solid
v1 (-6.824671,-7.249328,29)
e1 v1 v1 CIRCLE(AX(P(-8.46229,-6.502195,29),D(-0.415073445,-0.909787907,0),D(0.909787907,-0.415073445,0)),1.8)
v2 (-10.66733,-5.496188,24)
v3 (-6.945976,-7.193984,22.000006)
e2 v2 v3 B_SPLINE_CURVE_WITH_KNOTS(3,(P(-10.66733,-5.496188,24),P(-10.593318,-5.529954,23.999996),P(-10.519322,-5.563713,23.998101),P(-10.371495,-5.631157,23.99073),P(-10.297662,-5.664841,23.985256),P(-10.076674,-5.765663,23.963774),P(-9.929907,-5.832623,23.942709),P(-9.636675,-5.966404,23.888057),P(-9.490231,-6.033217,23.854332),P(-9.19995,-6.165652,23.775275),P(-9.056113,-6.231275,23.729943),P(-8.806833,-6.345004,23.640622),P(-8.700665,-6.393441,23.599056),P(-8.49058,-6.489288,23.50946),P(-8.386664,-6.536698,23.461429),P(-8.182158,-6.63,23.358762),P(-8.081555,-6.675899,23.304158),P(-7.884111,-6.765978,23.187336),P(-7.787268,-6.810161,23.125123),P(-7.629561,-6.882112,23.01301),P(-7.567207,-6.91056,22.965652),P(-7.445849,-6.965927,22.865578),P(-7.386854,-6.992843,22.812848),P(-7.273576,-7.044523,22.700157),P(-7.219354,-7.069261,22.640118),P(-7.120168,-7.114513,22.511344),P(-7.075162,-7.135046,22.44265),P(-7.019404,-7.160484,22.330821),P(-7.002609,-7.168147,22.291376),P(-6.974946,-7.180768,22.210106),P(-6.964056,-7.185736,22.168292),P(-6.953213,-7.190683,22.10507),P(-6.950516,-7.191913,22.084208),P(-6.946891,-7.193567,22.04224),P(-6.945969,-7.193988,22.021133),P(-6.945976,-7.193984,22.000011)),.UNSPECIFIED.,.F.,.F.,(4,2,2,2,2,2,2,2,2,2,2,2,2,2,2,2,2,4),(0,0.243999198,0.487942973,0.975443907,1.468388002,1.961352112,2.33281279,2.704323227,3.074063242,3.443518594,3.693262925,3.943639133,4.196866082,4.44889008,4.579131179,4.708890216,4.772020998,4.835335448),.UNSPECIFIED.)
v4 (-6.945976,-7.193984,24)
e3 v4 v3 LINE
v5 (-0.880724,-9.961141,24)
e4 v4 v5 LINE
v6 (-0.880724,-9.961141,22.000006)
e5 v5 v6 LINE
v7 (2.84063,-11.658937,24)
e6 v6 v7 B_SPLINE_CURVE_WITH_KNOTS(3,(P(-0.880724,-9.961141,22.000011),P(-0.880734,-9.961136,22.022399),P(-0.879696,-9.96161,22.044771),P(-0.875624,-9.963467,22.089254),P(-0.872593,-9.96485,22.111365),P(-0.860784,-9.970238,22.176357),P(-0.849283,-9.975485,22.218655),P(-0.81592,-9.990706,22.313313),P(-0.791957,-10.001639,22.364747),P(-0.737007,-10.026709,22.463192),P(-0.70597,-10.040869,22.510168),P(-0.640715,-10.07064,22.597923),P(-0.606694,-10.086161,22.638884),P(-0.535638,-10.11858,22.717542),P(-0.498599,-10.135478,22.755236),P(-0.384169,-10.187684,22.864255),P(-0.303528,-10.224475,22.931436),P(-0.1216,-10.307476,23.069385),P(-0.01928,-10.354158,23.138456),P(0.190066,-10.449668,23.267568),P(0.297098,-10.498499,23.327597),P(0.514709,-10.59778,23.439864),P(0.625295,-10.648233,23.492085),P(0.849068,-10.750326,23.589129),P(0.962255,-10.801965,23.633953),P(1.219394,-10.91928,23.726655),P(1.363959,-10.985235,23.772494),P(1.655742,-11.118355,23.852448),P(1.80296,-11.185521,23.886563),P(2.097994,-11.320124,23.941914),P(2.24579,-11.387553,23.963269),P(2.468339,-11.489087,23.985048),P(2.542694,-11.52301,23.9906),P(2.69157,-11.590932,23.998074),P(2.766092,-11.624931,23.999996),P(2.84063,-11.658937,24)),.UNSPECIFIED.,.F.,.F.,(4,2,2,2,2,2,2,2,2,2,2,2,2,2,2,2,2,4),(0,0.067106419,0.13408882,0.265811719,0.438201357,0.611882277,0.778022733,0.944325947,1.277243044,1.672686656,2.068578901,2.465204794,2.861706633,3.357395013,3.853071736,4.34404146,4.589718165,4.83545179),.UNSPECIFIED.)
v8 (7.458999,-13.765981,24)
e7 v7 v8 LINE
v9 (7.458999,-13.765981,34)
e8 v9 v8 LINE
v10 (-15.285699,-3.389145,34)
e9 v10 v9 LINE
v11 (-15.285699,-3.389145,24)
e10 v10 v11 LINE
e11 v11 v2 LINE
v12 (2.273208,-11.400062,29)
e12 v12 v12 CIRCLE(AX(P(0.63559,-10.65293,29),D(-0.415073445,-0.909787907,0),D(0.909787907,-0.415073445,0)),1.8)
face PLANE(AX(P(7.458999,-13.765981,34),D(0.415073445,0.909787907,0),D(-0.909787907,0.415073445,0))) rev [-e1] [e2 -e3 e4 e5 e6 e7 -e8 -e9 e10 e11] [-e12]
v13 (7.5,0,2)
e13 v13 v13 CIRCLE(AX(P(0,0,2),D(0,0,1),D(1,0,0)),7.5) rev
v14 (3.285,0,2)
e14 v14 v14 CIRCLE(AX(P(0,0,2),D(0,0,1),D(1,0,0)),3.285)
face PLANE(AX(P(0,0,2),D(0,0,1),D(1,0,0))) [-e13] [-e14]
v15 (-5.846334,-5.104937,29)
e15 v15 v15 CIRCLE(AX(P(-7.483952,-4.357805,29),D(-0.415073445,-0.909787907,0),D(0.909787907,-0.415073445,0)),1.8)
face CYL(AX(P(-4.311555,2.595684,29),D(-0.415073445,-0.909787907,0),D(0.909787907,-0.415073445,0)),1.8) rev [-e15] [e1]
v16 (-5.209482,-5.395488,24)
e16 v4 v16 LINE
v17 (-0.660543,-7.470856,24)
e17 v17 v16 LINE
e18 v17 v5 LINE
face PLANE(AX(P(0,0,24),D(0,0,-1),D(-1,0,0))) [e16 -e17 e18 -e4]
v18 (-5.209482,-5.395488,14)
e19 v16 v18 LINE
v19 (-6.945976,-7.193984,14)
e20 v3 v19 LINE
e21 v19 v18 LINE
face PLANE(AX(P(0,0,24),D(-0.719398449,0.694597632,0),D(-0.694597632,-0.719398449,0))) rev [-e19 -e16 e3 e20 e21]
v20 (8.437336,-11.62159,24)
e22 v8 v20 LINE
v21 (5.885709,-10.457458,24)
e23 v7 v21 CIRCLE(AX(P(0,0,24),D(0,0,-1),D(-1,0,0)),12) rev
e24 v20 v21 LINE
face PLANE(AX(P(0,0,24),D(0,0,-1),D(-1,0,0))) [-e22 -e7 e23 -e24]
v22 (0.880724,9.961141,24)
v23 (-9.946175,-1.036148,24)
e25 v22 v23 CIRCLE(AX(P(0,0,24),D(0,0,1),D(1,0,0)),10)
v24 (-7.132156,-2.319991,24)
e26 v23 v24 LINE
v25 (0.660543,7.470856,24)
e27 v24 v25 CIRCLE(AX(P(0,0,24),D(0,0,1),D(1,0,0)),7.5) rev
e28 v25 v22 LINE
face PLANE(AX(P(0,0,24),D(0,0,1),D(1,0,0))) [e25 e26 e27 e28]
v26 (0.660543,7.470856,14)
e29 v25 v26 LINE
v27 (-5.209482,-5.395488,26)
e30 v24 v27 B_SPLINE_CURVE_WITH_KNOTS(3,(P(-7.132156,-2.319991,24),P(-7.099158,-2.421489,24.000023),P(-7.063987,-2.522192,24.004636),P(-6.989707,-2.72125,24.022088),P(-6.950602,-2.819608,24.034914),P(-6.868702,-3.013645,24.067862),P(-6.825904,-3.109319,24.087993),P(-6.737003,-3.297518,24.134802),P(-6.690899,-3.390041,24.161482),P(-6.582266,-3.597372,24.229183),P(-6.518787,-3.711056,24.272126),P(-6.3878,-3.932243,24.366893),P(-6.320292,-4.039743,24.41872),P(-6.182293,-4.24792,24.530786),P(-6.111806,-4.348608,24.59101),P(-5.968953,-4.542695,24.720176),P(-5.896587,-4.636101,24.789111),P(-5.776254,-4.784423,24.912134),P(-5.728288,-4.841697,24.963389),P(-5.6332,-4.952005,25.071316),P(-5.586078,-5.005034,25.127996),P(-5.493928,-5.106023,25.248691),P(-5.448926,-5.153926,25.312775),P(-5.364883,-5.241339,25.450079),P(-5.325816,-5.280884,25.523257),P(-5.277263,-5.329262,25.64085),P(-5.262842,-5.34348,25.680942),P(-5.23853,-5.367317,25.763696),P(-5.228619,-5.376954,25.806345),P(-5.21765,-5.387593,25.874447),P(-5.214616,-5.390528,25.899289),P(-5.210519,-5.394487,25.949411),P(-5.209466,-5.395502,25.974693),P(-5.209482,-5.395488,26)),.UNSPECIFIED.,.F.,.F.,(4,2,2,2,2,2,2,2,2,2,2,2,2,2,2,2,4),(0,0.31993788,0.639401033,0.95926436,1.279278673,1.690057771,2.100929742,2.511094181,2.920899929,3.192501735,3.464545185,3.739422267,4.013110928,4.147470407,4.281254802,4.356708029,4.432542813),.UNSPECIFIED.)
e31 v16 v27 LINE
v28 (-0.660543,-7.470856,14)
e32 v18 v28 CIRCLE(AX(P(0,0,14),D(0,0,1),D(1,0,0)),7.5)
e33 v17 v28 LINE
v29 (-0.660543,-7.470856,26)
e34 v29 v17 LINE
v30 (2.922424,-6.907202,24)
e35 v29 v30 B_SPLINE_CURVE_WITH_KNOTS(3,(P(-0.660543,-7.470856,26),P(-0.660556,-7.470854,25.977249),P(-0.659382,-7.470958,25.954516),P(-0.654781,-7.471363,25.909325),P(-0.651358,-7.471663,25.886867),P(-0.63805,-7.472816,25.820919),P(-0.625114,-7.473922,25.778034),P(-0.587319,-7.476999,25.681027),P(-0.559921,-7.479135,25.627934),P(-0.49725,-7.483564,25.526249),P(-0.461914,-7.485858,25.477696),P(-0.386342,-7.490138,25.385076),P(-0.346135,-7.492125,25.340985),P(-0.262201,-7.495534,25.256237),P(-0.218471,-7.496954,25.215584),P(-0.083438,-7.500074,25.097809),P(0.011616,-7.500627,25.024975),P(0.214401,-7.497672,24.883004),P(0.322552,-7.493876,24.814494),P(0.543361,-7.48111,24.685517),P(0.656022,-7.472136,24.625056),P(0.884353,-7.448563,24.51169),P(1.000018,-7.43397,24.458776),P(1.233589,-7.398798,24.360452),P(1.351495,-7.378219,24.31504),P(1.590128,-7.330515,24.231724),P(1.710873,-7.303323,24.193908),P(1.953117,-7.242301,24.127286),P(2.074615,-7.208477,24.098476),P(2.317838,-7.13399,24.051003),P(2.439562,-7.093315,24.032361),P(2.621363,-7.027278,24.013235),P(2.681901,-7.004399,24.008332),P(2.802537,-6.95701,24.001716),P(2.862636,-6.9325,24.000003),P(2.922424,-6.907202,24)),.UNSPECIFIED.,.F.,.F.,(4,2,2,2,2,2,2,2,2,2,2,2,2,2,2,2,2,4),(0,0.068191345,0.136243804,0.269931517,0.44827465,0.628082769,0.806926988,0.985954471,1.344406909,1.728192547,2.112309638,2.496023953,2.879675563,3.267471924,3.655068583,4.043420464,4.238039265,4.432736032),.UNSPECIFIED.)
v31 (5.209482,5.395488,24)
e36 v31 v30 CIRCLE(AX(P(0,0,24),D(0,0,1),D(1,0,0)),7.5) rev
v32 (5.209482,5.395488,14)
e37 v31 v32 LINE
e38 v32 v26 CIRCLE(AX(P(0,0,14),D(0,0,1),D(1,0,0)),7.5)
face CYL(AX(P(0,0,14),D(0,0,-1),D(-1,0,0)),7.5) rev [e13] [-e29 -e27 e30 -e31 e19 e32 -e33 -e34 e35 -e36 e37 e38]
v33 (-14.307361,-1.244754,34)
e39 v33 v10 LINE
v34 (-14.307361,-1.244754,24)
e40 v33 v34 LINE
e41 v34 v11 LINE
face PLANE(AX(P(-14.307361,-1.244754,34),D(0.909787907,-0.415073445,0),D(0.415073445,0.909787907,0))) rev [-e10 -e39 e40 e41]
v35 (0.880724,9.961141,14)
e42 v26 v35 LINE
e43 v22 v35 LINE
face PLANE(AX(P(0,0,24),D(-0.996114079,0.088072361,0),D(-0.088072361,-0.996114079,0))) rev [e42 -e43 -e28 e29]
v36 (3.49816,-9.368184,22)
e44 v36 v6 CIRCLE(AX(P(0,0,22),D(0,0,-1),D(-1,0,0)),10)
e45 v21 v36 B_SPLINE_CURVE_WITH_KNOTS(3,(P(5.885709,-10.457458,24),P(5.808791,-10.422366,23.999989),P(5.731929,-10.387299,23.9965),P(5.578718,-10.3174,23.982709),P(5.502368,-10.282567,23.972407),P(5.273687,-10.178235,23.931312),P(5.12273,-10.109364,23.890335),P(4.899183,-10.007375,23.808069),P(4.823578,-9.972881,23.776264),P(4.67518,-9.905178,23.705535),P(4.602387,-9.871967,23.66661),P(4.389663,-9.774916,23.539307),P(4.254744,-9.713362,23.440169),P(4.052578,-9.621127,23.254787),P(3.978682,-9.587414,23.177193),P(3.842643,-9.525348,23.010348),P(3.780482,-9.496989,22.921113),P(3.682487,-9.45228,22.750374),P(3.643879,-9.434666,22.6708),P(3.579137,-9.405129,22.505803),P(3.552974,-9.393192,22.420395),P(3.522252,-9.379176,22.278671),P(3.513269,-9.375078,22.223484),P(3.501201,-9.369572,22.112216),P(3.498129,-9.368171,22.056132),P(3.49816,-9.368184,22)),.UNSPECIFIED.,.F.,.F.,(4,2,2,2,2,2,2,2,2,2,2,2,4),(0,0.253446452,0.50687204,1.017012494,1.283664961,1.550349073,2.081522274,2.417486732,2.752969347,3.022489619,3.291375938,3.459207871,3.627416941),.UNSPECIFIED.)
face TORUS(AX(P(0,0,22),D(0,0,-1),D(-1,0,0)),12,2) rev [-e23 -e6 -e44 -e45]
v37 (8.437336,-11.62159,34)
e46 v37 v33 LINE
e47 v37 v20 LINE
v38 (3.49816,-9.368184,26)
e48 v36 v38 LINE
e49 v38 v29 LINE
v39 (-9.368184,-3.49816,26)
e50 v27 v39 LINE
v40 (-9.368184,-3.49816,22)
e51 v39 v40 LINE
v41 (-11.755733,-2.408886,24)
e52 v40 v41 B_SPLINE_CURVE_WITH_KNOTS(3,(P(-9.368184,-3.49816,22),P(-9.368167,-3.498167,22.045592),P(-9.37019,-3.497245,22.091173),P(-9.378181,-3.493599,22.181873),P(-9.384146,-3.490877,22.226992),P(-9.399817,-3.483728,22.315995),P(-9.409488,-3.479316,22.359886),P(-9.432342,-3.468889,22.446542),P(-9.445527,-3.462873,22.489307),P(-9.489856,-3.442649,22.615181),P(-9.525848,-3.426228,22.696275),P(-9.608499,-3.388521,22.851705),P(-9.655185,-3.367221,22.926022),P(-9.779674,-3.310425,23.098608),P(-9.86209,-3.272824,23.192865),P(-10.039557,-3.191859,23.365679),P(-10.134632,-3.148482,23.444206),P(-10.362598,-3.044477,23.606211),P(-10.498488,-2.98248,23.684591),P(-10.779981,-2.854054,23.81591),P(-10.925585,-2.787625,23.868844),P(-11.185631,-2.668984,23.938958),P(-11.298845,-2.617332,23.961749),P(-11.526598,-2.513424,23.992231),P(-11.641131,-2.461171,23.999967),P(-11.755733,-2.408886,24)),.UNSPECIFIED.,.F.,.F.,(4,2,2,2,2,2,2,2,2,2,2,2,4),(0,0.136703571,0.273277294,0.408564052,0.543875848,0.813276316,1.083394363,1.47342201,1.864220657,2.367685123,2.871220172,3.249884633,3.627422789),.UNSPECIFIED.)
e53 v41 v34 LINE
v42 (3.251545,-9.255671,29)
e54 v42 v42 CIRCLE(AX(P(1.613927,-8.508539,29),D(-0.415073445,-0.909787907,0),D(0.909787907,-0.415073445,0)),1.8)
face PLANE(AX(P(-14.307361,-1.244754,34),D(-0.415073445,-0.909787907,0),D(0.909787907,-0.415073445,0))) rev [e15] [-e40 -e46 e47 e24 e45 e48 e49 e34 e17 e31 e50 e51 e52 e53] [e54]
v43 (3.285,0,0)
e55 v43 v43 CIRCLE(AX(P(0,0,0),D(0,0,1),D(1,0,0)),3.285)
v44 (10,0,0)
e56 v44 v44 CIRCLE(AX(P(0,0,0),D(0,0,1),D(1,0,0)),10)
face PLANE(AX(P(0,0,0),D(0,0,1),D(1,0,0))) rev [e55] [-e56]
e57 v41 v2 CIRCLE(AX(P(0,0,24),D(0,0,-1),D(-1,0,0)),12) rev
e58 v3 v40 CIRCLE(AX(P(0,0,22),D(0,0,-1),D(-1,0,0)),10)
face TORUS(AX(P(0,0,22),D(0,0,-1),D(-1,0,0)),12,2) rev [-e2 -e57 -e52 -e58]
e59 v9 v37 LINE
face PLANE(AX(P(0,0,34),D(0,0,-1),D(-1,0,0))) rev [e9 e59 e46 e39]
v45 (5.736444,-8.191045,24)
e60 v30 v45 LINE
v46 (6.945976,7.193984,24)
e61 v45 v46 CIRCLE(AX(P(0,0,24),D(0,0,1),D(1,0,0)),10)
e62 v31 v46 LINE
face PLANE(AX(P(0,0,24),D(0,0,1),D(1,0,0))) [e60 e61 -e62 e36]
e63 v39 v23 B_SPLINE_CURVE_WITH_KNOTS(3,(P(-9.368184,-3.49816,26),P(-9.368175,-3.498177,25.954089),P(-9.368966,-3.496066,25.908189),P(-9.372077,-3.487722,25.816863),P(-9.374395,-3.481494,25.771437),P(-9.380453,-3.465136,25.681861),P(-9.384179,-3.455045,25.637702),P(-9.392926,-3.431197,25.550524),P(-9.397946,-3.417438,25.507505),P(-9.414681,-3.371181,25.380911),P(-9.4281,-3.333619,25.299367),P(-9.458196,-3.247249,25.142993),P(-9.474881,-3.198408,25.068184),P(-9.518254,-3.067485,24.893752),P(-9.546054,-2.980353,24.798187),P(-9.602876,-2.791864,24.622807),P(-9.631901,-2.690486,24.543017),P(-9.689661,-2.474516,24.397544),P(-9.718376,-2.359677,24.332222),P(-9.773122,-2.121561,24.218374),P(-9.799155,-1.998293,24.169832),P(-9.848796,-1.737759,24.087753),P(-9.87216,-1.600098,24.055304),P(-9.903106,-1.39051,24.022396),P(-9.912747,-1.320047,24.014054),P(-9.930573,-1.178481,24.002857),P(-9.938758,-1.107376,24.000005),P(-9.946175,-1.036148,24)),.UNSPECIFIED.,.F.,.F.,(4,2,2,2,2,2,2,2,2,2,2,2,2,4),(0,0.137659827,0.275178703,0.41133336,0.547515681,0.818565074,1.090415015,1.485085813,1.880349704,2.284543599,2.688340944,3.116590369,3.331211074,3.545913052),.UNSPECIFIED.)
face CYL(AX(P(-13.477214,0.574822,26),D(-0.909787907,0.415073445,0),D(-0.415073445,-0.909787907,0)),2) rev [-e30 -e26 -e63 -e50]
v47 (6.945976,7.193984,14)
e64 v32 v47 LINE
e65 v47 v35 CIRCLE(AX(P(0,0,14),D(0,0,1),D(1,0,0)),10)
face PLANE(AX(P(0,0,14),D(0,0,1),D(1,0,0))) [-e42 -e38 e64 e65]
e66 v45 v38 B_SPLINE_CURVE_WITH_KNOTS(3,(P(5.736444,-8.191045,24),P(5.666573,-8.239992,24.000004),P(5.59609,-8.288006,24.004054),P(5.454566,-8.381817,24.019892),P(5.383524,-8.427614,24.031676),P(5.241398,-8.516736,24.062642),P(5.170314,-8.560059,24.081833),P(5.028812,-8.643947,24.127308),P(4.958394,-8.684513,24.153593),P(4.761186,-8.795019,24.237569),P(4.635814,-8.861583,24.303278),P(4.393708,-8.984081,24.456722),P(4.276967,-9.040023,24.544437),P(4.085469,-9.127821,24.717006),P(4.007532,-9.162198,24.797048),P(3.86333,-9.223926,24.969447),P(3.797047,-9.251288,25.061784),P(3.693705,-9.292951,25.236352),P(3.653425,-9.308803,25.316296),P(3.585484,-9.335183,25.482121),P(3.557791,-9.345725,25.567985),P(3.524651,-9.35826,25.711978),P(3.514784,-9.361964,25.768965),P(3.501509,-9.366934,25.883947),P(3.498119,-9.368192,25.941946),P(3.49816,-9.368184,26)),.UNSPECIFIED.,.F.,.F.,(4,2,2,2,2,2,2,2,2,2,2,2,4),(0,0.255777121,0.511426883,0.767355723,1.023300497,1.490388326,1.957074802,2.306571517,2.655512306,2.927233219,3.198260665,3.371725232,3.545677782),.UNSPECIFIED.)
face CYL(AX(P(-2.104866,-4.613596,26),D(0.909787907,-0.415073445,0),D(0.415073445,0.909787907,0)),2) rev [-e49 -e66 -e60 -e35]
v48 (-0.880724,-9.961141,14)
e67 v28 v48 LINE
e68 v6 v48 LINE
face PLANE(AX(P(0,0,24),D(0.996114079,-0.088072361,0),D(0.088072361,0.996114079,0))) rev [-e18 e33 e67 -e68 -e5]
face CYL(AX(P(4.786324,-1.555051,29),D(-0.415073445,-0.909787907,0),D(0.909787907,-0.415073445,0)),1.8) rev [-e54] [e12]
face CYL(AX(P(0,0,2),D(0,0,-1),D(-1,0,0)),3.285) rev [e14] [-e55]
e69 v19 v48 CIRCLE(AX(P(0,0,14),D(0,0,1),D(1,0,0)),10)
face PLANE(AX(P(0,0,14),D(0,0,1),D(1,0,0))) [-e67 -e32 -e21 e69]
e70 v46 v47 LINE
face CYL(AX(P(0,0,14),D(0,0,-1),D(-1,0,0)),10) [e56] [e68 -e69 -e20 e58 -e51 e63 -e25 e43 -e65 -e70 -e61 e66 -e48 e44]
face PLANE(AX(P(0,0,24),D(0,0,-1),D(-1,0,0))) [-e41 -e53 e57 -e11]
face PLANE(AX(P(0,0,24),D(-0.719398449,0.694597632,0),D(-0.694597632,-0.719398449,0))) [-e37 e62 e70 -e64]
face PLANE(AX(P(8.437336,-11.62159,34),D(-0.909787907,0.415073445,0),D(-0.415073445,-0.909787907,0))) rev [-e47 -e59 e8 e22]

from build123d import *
from build123d.topology import SkipClean

# Parameters (mm, degrees)
SKETCH1_R           = 7.5
SKETCH1_R_2         = 3.285
BOSS_EXTRUDE1_DEPTH = 2
SKETCH1_3_R         = 10
SKETCH1_3_R_2       = 7.5
BOSS_EXTRUDE2_DEPTH = 14
BOSS_EXTRUDE3_DEPTH = 10
BOSS_EXTRUDE4_DEPTH = 10
SKETCH4_R           = 1.8
CUT_EXTRUDE1_DEPTH  = 10
FILLET1_R           = 2
FILLET2_R           = 2


with BuildPart() as part:
    # Sketch1 → Boss-Extrude1 (new body)
    with BuildSketch(Plane.XY):
        Circle(SKETCH1_R)
        Circle(SKETCH1_R_2, mode=Mode.SUBTRACT)
    extrude(amount=BOSS_EXTRUDE1_DEPTH)

    # Sketch1<3> → Boss-Extrude2 (add)
    with BuildSketch(Plane.XY):
        Circle(SKETCH1_3_R)
        Circle(SKETCH1_3_R_2, mode=Mode.SUBTRACT)
    extrude(amount=BOSS_EXTRUDE2_DEPTH)

    # Sketch2 → Boss-Extrude3 (add)
    with SkipClean():  # the faces are left unmerged after this step: merging them gives an invalid solid
        with BuildSketch(Plane.XY.offset(14)):
            with BuildLine():
                ThreePointArc((0.880723614, 9.961140794), (-9.097879067, 4.150734451), (-6.945976325, -7.193984493))
                Line((-6.945976325, -7.193984493), (-5.209482244, -5.39548837))
                ThreePointArc((-5.209482244, -5.39548837), (-6.8234093, 3.113050838), (0.66054271, 7.470855595))
                Line((0.66054271, 7.470855595), (0.880723614, 9.961140794))
            make_face()
            with BuildLine():
                Line((-0.66054271, -7.470855595), (-0.880723614, -9.961140794))
                ThreePointArc((-0.880723614, -9.961140794), (6.752509306, -7.375880833), (10, 0))
                ThreePointArc((10, 0), (9.204883575, 3.907699883), (6.945976325, 7.193984493))
                Line((6.945976325, 7.193984493), (5.209482244, 5.39548837))
                ThreePointArc((5.209482244, 5.39548837), (6.903662681, 2.930774912), (7.5, 0))
                ThreePointArc((7.5, 0), (5.06438198, -5.531910625), (-0.66054271, -7.470855595))
            make_face()
        extrude(amount=BOSS_EXTRUDE3_DEPTH)

    # Sketch3 → Boss-Extrude4 (add)
    with SkipClean():  # the faces are left unmerged after this step: merging them gives an invalid solid
        with BuildSketch(Plane.XY.offset(24)):
            Polygon((8.437336357, -11.621590046), (7.458998865, -13.765980707), (-15.285698803, -3.38914458), (-14.307361311, -1.244753919), align=None)
        extrude(amount=BOSS_EXTRUDE4_DEPTH)

    # Sketch4 → Cut-Extrude1 (cut)
    with SkipClean():  # the faces are left unmerged after this step: merging them gives an invalid solid
        with BuildSketch(Plane(origin=(-3.913349969, -8.577562644, 0), x_dir=(0.9097879067131455, -0.4150734450654641, 0), z_dir=(-0.4150734450654641, -0.9097879067131455, 0))):
            with Locations((-5, 29)):
                Circle(SKETCH4_R)
            with Locations((5, 29)):
                Circle(SKETCH4_R)
        extrude(amount=-CUT_EXTRUDE1_DEPTH, mode=Mode.SUBTRACT)

    # Fillet1
    # the kernel refuses this fillet: 2 mm, written as the material it adds along each edge
    with BuildSketch(Plane(origin=(-5.209482244, -5.39548837, 24), x_dir=(0.415073445065464, 0.9097879067131456, 0), z_dir=(0.9097879067131456, -0.415073445065464, 0))) as fillet1_piece_1_section:
        with BuildLine():
            CenterArc((FILLET1_R, FILLET1_R), FILLET1_R, 180, 90)
            Line((0, FILLET1_R), (0, 0))
            Line((0, 0), (FILLET1_R, 0))
        make_face()
    fillet1_piece_1 = extrude(amount=14.571067812, mode=Mode.PRIVATE)
    fillet1_piece_1 = fillet1_piece_1 & Plane(origin=(0, 0, 24.466684855), x_dir=(-0.08807236135728662, -0.9961140793929938, 0), z_dir=(0, 0, -1)) * Cylinder(10, 38, mode=Mode.PRIVATE)
    fillet1_piece_1 = fillet1_piece_1 - Plane(origin=(0, 0, 24.466684855), x_dir=(0.6945976324993828, 0.7193984493493522, 0), z_dir=(0, 0, -1)) * Cylinder(7.5, 38, mode=Mode.PRIVATE)
    add(fillet1_piece_1)
    with BuildSketch(Plane(origin=(-13.917123993, -1.42279228, 24), x_dir=(0.415073445065464, 0.9097879067131456, 0), z_dir=(0.9097879067131456, -0.415073445065464, 0))) as fillet1_piece_2_section:
        with BuildLine():
            CenterArc((FILLET1_R, FILLET1_R), FILLET1_R, 180, 90)
            Line((0, FILLET1_R), (0, 0))
            Line((0, 0), (FILLET1_R, 0))
        make_face()
    fillet1_piece_2 = extrude(amount=14.571067812, mode=Mode.PRIVATE)
    fillet1_piece_2 = fillet1_piece_2 & Plane(origin=(0, 0, 24.466680249), x_dir=(0.08807236135728662, 0.9961140793929938, 0), z_dir=(0, 0, -1)) * Cylinder(10, 38, mode=Mode.PRIVATE)
    fillet1_piece_2 = fillet1_piece_2 - Plane(origin=(0, 0, 24.466680249), x_dir=(0.6945976324993828, 0.7193984493493522, 0), z_dir=(0, 0, -1)) * Cylinder(7.5, 38, mode=Mode.PRIVATE)
    add(fillet1_piece_2)

    # Fillet2
    # the kernel refuses this fillet: 2 mm, written as the material it adds along each edge
    with BuildSketch(Plane(origin=(0, 0, 24), x_dir=(0.7561376391606037, -0.6544126149797455, 0), z_dir=(0.6544126149797455, 0.7561376391606037, 0))) as fillet2_piece_1_section:
        with BuildLine():
            CenterArc((10 + FILLET2_R, FILLET2_R), FILLET2_R, 180, 90)
            Line((10 + FILLET2_R, 0), (10, 0))
            Line((10, 0), (10, FILLET2_R))
        make_face()
    fillet2_piece_1 = revolve(axis=Axis((0, 0, 24), (0, 0, -1)), revolution_arc=82.826410261, mode=Mode.PRIVATE)
    fillet2_piece_1 = split(fillet2_piece_1, bisect_by=Plane(origin=(2.607194883, -8.96169878, 23.537511389), z_dir=(-0.415073445065464, -0.9097879067131456, 0)), keep=Keep.TOP, mode=Mode.PRIVATE)
    fillet2_piece_1 = split(fillet2_piece_1, bisect_by=Plane(origin=(1.628857391, -11.106089441, 23.537511389), z_dir=(0.41507344506546406, 0.9097879067131456, 0)), keep=Keep.TOP, mode=Mode.PRIVATE)
    add(fillet2_piece_1)
    with BuildSketch(Plane(origin=(0, 0, 24), x_dir=(-0.9898439357335846, 0.1421583022248339, 0), z_dir=(0.1421583022248339, 0.9898439357335846, 0))) as fillet2_piece_2_section:
        with BuildLine():
            CenterArc((10 + FILLET2_R, -FILLET2_R), FILLET2_R, 90, 90)
            Line((10 + FILLET2_R, 0), (10, 0))
            Line((10, 0), (10, -FILLET2_R))
        make_face()
    fillet2_piece_2 = revolve(axis=Axis((0, 0, 24), (0, 0, 1)), revolution_arc=82.826410261, mode=Mode.PRIVATE)
    fillet2_piece_2 = split(fillet2_piece_2, bisect_by=Plane(origin=(-8.477218422, -3.904645831, 23.537511225), z_dir=(-0.415073445065464, -0.9097879067131456, 0)), keep=Keep.TOP, mode=Mode.PRIVATE)
    fillet2_piece_2 = split(fillet2_piece_2, bisect_by=Plane(origin=(-9.455555915, -6.049036492, 23.537511225), z_dir=(0.41507344506546406, 0.9097879067131456, 0)), keep=Keep.TOP, mode=Mode.PRIVATE)
    add(fillet2_piece_2)


solid = part.part
